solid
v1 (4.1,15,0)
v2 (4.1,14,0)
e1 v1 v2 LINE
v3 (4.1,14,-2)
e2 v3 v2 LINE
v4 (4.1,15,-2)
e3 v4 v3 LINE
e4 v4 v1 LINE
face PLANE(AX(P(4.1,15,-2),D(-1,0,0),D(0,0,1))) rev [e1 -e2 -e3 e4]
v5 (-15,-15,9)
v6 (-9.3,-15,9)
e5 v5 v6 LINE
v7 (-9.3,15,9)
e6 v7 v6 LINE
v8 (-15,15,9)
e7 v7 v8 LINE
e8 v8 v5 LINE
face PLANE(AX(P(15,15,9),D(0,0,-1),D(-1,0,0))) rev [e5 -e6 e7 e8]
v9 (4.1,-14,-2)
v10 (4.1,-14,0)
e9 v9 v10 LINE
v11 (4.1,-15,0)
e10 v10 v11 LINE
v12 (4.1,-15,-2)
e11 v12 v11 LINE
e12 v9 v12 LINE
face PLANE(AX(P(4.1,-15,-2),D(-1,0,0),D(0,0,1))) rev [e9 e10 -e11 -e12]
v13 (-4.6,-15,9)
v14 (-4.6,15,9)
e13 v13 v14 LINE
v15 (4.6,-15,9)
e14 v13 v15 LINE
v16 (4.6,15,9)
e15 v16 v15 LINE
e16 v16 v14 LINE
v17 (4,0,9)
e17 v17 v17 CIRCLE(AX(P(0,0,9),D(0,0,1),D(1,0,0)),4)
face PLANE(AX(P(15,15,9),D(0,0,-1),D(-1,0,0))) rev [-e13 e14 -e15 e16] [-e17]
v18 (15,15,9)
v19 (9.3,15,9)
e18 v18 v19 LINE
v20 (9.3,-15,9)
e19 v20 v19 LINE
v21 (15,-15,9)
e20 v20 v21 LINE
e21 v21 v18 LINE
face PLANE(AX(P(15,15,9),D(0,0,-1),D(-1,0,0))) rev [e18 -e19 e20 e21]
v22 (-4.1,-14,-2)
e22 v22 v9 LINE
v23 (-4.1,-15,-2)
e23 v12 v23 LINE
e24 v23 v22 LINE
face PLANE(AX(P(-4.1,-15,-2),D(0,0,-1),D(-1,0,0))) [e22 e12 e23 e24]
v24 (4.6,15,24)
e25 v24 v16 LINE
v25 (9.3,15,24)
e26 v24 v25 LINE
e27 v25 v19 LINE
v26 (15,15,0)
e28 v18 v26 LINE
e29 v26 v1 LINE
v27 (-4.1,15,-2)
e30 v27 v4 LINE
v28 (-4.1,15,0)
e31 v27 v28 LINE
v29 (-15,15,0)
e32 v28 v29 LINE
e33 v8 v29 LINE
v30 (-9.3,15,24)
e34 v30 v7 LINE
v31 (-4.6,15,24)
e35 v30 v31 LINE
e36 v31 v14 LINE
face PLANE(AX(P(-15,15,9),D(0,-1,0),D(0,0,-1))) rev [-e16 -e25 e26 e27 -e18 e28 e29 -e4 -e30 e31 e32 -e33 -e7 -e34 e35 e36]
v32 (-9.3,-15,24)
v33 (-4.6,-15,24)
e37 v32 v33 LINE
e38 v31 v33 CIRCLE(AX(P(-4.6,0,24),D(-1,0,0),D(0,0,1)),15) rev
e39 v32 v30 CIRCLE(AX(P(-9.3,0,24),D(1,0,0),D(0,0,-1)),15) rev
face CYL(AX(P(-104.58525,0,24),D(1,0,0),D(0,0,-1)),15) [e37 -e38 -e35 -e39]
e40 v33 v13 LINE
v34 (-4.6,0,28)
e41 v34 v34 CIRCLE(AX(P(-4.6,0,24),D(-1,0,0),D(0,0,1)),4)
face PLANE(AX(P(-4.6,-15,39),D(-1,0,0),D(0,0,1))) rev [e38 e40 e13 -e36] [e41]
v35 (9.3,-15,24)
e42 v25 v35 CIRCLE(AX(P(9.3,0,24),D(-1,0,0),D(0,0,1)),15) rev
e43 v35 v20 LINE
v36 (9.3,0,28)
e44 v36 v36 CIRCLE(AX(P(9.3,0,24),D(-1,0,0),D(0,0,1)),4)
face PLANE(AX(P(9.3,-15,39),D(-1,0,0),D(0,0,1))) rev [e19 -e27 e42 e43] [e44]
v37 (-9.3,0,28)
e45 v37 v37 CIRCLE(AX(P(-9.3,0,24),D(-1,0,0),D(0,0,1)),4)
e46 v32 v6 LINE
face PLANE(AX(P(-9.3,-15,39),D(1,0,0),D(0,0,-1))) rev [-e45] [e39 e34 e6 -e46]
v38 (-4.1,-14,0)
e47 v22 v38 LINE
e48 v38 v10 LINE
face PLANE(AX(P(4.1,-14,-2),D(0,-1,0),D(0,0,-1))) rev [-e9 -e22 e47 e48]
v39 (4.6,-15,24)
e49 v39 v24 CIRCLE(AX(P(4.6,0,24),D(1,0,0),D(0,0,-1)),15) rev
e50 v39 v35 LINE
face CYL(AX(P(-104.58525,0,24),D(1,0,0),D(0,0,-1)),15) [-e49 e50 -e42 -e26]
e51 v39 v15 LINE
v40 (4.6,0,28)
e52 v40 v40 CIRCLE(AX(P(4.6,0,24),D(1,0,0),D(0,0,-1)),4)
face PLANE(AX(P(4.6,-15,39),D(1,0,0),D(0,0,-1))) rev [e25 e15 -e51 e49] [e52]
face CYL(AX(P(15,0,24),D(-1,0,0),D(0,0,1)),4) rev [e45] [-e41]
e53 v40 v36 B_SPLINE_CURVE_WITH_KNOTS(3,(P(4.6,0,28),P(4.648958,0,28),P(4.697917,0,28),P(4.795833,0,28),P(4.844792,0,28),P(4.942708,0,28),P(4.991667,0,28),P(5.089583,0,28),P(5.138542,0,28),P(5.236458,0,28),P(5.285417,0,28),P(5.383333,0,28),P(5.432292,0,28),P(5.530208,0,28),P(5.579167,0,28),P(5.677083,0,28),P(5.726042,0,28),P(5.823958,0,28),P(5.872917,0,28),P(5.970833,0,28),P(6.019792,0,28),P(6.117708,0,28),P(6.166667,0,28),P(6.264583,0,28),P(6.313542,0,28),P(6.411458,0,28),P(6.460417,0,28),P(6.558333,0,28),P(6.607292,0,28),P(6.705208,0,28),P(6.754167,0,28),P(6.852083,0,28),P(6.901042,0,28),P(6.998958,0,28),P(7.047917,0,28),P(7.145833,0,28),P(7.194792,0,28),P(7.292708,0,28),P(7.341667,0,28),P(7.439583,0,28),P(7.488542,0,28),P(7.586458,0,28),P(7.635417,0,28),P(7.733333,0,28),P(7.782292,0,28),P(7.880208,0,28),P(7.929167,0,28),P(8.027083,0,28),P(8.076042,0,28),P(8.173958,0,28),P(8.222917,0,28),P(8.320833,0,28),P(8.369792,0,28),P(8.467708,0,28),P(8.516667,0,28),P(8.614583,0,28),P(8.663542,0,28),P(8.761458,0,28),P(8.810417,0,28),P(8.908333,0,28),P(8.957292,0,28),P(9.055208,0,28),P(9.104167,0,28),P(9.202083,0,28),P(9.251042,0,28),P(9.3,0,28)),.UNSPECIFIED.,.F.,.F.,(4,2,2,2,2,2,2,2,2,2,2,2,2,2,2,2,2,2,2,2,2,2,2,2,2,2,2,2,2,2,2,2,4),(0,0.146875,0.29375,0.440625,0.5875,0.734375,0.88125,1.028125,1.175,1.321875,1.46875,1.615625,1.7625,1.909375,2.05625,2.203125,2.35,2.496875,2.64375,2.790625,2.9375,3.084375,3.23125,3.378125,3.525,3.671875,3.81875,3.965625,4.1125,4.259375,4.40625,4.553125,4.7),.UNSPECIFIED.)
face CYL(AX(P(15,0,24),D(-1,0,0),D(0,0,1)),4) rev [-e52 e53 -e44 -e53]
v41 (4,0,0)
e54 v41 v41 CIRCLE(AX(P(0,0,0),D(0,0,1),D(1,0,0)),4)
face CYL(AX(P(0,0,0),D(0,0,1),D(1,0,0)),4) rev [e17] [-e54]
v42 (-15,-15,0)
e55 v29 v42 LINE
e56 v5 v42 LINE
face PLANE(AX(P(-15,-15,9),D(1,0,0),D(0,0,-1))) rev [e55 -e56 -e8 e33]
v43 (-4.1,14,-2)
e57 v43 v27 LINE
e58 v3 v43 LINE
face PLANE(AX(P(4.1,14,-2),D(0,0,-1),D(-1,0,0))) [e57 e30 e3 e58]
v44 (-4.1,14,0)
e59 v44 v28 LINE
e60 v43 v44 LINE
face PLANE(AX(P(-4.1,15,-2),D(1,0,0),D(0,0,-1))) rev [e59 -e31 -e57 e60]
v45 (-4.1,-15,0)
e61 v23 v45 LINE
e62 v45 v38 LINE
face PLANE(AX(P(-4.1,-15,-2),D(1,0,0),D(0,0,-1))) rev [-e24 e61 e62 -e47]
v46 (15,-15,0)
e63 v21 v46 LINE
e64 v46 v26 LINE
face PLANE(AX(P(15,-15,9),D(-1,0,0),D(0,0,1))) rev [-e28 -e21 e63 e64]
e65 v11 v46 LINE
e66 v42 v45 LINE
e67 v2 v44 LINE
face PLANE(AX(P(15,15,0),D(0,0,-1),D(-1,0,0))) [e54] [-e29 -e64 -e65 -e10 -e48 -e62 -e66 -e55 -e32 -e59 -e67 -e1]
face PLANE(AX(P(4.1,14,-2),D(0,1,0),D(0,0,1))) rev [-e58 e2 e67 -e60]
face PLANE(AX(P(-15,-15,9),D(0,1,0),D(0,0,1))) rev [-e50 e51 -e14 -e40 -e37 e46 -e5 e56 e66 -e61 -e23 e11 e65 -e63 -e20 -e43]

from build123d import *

# Parameters (mm, degrees)
SKETCH_1_W          = 30
SKETCH_1_H          = 30
EXTRUDE_1_DEPTH     = 9
SKETCH_2_W          = 4.7
SKETCH_2_H          = 30
EXTRUDE_2_DEPTH     = 30
CUT_EXTRUDE_START   = -18.6
CUT_EXTRUDE_2_DEPTH = 18.6
SKETCH_4_R          = 4
CUT_EXTRUDE_3_DEPTH = 49.337252715
SKETCH_6_R          = 4
CUT_EXTRUDE_5_DEPTH = 37.742346142
SKETCH_7_W          = 8.2
SKETCH_7_H          = 1
EXTRUDE_3_DEPTH     = 2


# Read off the part's stored shape, not the designer's step: 切除-拉伸2
with BuildPart() as part:
    # 草图1 → 凸台-拉伸1 (new body)
    with BuildSketch(Plane.XY):
        Rectangle(SKETCH_1_W, SKETCH_1_H)
    extrude(amount=EXTRUDE_1_DEPTH)

    # 草图2 → 凸台-拉伸2 (add)
    with BuildSketch(Plane.XY.offset(9)):
        with Locations((-6.95, 0)):
            Rectangle(SKETCH_2_W, SKETCH_2_H)
        with Locations((6.95, 0)):
            Rectangle(SKETCH_2_W, SKETCH_2_H)
    extrude(amount=EXTRUDE_2_DEPTH)

    # 切除-拉伸2 outline → 切除-拉伸2 (cut)
    with BuildSketch(Plane.ZY.offset(9.3).offset(CUT_EXTRUDE_START)):
        with BuildLine():
            Line((39, 15), (24, 15))
            ThreePointArc((24, 15), (34.606601718, 10.606601718), (39, 0))
            Line((39, 0), (39, 15))
        make_face()
        with BuildLine():
            Line((39, -15), (39, 0))
            ThreePointArc((39, 0), (34.606601718, -10.606601718), (24, -15))
            Line((24, -15), (39, -15))
        make_face()
    extrude(amount=CUT_EXTRUDE_2_DEPTH, mode=Mode.SUBTRACT)

    # 草图4 → 切除-拉伸3 (cut, through all)
    with BuildSketch(Plane.ZY.offset(9.3)):
        with Locations((24, 0)):
            Circle(SKETCH_4_R)
    extrude(amount=-CUT_EXTRUDE_3_DEPTH, mode=Mode.SUBTRACT)

    # 草图6 → 切除-拉伸5 (cut, through all)
    with BuildSketch(Plane.XY.offset(9)):
        Circle(SKETCH_6_R)
    extrude(amount=-CUT_EXTRUDE_5_DEPTH, mode=Mode.SUBTRACT)

    # 草图7 → 凸台-拉伸3 (add)
    with BuildSketch(Plane(origin=(0, 0, 0), x_dir=(-1, 0, 0), z_dir=(0, 0, -1))):
        with Locations((0, 14.5)):
            Rectangle(SKETCH_7_W, SKETCH_7_H)
        with Locations((0, -14.5)):
            Rectangle(SKETCH_7_W, SKETCH_7_H)
    extrude(amount=EXTRUDE_3_DEPTH)


solid = part.part
